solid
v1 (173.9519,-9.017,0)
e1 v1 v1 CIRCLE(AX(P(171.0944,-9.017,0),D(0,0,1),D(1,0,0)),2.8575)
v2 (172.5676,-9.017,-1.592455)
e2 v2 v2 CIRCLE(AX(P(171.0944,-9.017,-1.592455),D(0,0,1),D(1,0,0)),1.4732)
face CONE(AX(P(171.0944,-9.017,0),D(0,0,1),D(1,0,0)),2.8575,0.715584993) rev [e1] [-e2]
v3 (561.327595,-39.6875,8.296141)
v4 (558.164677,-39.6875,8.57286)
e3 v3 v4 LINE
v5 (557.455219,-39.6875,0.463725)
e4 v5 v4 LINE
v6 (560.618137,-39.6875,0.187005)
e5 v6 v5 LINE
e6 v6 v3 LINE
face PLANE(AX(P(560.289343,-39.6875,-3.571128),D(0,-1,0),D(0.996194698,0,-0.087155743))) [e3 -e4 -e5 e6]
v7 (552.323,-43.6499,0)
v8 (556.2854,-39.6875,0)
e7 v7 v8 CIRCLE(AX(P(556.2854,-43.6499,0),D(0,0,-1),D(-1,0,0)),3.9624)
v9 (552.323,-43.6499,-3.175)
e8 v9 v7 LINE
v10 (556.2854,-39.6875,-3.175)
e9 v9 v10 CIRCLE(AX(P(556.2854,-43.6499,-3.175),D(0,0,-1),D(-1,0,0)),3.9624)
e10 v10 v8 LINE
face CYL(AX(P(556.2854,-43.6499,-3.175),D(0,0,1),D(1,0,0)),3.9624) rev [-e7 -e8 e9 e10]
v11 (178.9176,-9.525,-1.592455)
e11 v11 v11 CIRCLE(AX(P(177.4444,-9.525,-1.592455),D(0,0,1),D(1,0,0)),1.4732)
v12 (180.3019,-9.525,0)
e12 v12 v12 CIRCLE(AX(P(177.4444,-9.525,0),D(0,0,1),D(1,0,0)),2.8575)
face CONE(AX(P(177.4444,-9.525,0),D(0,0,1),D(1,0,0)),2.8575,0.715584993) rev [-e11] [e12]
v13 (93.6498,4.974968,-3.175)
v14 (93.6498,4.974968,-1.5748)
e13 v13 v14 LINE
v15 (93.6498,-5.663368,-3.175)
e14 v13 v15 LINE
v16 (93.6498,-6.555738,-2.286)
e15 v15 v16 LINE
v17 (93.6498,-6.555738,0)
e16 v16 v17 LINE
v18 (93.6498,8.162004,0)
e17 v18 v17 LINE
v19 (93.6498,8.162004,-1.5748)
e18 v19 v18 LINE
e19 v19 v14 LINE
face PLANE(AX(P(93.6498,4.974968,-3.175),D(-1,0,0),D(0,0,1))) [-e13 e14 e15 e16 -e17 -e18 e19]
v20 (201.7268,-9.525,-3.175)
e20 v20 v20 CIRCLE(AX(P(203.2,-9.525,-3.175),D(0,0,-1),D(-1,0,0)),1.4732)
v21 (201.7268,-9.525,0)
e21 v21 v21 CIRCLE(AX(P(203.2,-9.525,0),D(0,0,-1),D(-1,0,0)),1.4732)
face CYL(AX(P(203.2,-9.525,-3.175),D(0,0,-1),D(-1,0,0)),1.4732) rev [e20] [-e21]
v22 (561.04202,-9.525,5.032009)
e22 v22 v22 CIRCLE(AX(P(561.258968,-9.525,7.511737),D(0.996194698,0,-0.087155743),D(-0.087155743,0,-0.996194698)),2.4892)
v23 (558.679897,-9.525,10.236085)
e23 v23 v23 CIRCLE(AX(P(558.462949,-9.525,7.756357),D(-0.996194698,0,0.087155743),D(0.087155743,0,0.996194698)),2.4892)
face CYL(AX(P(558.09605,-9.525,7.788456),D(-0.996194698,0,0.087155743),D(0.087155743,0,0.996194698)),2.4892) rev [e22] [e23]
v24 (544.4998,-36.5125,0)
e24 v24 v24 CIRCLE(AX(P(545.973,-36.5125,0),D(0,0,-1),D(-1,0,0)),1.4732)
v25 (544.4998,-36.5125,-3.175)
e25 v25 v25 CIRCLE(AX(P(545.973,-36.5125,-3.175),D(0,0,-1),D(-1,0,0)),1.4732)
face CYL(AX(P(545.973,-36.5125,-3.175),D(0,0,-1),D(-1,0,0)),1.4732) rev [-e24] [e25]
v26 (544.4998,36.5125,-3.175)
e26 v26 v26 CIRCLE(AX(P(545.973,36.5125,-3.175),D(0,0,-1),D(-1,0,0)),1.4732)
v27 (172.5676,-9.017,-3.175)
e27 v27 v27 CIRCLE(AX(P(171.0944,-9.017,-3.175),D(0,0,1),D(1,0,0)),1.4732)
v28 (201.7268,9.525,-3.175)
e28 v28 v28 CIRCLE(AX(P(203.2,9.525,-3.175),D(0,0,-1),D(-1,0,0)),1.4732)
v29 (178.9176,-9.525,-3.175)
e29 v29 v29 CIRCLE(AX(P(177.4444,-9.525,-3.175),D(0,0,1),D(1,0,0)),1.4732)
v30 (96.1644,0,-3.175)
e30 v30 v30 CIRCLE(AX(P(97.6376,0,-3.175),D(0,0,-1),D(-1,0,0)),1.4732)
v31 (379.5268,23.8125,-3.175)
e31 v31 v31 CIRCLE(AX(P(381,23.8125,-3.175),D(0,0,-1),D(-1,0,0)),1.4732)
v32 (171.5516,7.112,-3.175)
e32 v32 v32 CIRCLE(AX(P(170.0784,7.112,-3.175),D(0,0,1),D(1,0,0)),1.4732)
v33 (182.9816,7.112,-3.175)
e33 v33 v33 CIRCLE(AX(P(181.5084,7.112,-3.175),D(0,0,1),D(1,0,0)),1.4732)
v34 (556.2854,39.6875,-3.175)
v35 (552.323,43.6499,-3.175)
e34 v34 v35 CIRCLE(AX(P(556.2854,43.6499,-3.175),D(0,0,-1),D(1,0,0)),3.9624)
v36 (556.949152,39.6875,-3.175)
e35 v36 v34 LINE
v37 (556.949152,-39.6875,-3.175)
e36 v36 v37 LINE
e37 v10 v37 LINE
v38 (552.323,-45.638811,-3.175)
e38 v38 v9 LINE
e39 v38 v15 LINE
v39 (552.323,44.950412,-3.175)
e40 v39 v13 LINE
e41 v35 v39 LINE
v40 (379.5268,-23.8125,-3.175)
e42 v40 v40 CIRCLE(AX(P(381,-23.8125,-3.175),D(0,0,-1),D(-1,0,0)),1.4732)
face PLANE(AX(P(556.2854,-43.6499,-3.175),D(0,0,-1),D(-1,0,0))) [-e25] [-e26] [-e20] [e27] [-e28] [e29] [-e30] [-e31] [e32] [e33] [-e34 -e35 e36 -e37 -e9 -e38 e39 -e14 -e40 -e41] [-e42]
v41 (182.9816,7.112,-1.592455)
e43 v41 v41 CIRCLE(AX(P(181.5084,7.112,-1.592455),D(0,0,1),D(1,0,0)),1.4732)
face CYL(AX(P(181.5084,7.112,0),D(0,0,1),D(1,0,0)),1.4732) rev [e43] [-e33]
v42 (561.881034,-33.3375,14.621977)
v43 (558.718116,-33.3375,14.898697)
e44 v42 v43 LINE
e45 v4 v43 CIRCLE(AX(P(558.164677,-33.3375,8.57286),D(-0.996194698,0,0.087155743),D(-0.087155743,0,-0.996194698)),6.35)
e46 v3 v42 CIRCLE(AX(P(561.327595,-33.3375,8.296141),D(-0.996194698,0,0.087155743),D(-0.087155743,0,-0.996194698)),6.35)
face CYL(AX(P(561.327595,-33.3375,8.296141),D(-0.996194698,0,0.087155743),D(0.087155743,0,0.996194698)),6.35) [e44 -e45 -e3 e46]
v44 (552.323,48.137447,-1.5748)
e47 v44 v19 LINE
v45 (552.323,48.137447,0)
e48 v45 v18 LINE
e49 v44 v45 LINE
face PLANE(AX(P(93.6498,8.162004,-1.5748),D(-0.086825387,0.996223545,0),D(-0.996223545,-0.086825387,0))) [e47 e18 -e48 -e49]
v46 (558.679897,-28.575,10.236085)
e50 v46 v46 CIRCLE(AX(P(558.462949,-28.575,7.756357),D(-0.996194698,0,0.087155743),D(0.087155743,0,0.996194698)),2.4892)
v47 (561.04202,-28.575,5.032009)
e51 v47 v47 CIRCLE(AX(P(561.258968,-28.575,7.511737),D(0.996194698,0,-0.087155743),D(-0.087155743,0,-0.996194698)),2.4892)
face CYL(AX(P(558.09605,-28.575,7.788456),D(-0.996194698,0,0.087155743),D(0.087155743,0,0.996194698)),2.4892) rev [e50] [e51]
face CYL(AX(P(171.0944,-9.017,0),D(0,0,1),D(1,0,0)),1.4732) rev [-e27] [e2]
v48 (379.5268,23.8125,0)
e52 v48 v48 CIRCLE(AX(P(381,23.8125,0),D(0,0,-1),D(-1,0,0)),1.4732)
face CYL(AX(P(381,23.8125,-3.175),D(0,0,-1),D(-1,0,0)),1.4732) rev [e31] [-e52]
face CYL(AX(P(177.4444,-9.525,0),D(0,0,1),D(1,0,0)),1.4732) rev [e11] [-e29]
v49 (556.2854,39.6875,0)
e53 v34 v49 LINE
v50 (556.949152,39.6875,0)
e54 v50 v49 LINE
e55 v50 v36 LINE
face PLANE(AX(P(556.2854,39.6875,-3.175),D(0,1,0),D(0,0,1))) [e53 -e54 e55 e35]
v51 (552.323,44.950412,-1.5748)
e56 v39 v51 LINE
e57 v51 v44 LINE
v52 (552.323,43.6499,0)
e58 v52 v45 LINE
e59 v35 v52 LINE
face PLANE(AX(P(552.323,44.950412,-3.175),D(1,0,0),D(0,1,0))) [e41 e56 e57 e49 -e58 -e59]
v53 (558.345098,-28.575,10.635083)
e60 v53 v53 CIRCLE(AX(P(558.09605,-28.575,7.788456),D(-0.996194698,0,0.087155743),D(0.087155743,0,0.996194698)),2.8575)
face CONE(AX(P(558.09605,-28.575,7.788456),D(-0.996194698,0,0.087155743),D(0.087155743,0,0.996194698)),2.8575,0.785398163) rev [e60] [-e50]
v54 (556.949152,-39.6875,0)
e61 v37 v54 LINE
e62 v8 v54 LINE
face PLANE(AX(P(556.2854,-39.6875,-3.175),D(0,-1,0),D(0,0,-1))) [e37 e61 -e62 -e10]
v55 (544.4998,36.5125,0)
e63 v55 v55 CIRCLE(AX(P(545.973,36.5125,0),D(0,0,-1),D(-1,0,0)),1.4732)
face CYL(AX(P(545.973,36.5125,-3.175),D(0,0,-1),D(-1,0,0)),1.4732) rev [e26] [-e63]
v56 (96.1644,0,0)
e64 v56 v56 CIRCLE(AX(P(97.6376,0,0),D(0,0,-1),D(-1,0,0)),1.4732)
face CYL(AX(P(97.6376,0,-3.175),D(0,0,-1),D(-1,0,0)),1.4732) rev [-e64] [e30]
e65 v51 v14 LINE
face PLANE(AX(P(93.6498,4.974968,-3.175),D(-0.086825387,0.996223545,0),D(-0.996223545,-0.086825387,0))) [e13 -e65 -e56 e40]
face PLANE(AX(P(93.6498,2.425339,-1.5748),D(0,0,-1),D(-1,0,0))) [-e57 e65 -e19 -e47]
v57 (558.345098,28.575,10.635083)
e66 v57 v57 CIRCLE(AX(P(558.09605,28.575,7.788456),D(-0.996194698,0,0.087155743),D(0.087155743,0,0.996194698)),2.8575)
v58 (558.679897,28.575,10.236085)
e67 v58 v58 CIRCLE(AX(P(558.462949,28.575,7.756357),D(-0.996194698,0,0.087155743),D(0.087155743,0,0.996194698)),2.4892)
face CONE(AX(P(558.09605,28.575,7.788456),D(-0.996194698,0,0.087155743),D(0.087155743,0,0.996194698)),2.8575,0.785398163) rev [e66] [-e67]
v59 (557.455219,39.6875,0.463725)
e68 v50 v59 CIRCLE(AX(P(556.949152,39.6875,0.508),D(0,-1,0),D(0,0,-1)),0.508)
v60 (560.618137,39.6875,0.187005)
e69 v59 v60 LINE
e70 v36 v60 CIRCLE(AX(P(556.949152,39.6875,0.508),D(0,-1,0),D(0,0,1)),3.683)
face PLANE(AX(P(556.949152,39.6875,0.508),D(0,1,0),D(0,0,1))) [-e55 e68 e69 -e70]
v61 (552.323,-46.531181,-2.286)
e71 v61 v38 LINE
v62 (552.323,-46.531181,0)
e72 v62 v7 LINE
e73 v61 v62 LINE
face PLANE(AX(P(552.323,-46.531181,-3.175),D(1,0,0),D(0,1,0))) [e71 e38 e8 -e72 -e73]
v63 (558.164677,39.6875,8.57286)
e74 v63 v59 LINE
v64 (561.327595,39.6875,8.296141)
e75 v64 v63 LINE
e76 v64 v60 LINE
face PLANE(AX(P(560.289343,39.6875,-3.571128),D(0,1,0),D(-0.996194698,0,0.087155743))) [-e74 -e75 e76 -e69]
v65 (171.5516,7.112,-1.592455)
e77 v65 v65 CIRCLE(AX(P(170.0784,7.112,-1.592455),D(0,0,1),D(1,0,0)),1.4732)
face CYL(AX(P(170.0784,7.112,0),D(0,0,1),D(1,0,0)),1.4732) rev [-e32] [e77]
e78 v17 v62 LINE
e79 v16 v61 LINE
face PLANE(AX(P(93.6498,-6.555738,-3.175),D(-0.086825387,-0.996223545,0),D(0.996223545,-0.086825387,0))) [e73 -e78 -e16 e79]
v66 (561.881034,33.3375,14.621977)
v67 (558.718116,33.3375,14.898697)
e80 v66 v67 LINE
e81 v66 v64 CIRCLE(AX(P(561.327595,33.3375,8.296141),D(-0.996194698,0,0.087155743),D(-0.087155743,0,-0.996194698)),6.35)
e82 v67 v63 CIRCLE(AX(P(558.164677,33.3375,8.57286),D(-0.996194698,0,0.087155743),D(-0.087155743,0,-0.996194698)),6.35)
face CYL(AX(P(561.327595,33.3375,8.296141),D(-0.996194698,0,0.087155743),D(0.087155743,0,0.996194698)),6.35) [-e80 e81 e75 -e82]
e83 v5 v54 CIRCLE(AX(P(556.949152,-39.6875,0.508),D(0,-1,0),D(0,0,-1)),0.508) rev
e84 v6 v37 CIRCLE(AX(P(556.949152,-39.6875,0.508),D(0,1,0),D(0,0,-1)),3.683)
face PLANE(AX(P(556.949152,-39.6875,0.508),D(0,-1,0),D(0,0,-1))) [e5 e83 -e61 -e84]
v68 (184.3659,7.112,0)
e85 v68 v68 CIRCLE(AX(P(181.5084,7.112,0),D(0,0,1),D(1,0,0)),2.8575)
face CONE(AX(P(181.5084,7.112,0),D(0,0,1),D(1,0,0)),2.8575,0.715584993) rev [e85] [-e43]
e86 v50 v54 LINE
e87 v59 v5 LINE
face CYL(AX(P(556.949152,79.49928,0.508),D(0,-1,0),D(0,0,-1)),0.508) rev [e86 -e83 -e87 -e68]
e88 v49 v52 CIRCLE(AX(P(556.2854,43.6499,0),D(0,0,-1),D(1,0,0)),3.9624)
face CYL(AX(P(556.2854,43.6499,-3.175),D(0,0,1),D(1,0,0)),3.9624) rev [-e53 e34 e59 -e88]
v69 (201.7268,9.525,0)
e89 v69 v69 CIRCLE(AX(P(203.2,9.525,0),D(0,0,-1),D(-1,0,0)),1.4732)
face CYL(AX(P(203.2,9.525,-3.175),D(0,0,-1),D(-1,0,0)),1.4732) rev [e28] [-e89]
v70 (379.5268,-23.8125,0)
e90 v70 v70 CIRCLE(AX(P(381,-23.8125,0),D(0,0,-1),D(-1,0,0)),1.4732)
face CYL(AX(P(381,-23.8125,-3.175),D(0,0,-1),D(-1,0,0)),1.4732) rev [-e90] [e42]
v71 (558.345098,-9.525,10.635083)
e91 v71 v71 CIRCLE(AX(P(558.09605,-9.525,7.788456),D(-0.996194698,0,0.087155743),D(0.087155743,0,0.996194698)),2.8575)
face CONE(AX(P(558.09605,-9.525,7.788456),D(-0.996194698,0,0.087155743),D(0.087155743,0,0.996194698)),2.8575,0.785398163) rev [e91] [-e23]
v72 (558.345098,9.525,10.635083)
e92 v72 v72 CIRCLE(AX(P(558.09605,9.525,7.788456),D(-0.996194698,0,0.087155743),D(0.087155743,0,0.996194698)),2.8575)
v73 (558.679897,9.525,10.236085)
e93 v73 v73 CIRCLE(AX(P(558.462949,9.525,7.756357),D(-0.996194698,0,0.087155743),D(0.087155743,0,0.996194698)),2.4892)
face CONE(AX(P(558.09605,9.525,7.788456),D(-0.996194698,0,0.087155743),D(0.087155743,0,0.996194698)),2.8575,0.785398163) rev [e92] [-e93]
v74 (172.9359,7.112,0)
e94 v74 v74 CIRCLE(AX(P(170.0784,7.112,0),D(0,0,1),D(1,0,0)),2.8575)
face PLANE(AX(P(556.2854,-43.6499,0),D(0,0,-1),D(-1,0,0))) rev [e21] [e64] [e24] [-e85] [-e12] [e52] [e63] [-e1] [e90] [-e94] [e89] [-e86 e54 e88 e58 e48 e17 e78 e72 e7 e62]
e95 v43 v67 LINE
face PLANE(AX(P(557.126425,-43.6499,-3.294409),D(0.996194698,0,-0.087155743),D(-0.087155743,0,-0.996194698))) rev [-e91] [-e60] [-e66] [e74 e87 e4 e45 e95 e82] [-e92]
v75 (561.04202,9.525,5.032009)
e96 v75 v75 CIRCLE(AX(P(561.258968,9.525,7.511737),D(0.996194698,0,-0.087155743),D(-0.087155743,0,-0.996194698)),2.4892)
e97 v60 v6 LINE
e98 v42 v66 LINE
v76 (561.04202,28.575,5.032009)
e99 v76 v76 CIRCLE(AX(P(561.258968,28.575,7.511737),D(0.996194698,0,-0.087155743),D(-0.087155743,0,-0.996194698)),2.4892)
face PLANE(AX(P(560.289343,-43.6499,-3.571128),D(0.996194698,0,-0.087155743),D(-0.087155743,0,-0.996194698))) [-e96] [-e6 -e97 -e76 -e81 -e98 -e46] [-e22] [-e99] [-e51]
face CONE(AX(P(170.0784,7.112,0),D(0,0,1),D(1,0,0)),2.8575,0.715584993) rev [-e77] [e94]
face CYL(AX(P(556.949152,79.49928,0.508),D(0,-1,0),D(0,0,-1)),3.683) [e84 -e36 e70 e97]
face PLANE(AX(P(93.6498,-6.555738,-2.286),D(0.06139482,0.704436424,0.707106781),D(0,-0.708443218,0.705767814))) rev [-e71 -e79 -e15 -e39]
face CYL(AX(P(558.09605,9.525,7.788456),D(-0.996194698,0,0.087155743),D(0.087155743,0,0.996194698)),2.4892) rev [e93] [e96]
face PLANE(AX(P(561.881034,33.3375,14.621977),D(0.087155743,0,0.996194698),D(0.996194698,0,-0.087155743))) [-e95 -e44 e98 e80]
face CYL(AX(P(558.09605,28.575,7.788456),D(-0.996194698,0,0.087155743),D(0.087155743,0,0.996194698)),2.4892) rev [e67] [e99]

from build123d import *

# Parameters (mm, degrees)
BASE_FLANGE1_DEPTH                            = 3.175
SKETCHED_START                                = -39.6875
SKETCHED_BEND2_DEPTH                          = 79.375
SKETCHED_BEND2_2_DEPTH                        = 79.375
SKETCHED_START_2                              = 554.168566106
SKETCHED_BEND2_3_DEPTH                        = 4.831433894
EXTRUDE3_DEPTH                                = 1.5748
F_9_0_196_DIAMETER_HOLE1_D                    = 4.9784
F_9_0_196_DIAMETER_HOLE1_CSINK_D              = 5.715
F_9_0_196_DIAMETER_HOLE1_CSINK_ANGLE          = 90
CHAMFER1_SIZE                                 = 0.889
F_0_116_DIAMETER_HOLE1_D                      = 2.9464
CSK_FOR_4_FLAT_HEAD_MACHINE_SCREW1_AT_2_COUNT = 2
CSK_FOR_4_FLAT_HEAD_MACHINE_SCREW1_AT_2_PITCH = 16.160968319
CSK_FOR_4_FLAT_HEAD_MACHINE_SCREW1_AT_3_COUNT = 2
CSK_FOR_4_FLAT_HEAD_MACHINE_SCREW1_AT_3_PITCH = 11.43
CSK_FOR_4_FLAT_HEAD_MACHINE_SCREW1_AT_4_COUNT = 2
CSK_FOR_4_FLAT_HEAD_MACHINE_SCREW1_AT_4_PITCH = 18.194716953


with BuildPart() as part:
    # Base-Flange1: sheet metal written as solids
    # Sketch1 → Base-Flange1 (new body)
    with BuildSketch(Plane.XY):
        with BuildLine():
            Line((93.6498, 4.974967896), (552.323, 44.950411579))
            Line((552.323, 44.950411579), (552.323, 43.6499))
            ThreePointArc((552.323, 43.6499), (553.48356009, 40.84806009), (556.2854, 39.6875))
            Line((556.2854, 39.6875), (568.198, 39.6875))
            ThreePointArc((568.198, 39.6875), (572.688128061, 37.827628061), (574.548, 33.3375))
            Line((574.548, 33.3375), (574.548, -33.3375))
            ThreePointArc((574.548, -33.3375), (572.688128061, -37.827628061), (568.198, -39.6875))
            Line((568.198, -39.6875), (556.2854, -39.6875))
            ThreePointArc((556.2854, -39.6875), (553.48356009, -40.84806009), (552.323, -43.6499))
            Line((552.323, -43.6499), (552.323, -46.531181284))
            Line((552.323, -46.531181284), (93.6498, -6.555737601))
            Line((93.6498, -6.555737601), (93.6498, 4.974967896))
        make_face()
    extrude(amount=-BASE_FLANGE1_DEPTH)

    # Sketched Bend2: read off the stored shape, not the designer's step
    # Sketched Bend2 outline → Sketched Bend2 (cut)
    with BuildSketch(Plane(origin=(0, 0, 0), x_dir=(1, 0, 0), z_dir=(0, 1, 0)).offset(SKETCHED_START)):
        with BuildLine():
            ThreePointArc((556.949152286, 3.175), (559.367160247, 2.270079642), (560.596949567, 0))
            Line((560.596949567, 0), (574.548, 0))
            Line((574.548, 0), (574.548, 3.175))
            Line((574.548, 3.175), (556.949152286, 3.175))
        make_face()
    extrude(amount=SKETCHED_BEND2_DEPTH, mode=Mode.SUBTRACT)

    # Sketched Bend2 2 outline → Sketched Bend2 2 (add)
    with BuildSketch(Plane(origin=(0, 0, 0), x_dir=(1, 0, 0), z_dir=(0, 1, 0)).offset(SKETCHED_START)):
        with BuildLine():
            Line((557.455219193, -0.463724883), (558.718115569, -14.89869652))
            Line((558.718115569, -14.89869652), (561.881033736, -14.621977036))
            Line((561.881033736, -14.621977036), (560.618137359, -0.187005399))
            ThreePointArc((560.618137359, -0.187005399), (560.608738158, -0.09336734), (560.596949567, 0))
            Line((560.596949567, 0), (556.949152286, 0))
            ThreePointArc((556.949152286, 0), (557.292352112, -0.133463113), (557.455219193, -0.463724883))
        make_face()
    extrude(amount=SKETCHED_BEND2_2_DEPTH)

    # Sketched Bend2 3 outline → Sketched Bend2 3 (cut)
    with BuildSketch(Plane(origin=(0, 0, 0), x_dir=(0, 1, 0), z_dir=(0.9961946980917459, 0, -0.0871557427476548)).offset(SKETCHED_START_2)):
        with BuildLine():
            Line((39.6875, 63.537494831), (33.3375, 63.53749483))
            ThreePointArc((33.3375, 63.53749483), (37.827628061, 61.677622891), (39.6875, 57.18749483))
            Line((39.6875, 57.18749483), (39.6875, 63.537494831))
        make_face()
        with BuildLine():
            ThreePointArc((-39.6875, 57.18749483), (-37.827628061, 61.677622891), (-33.3375, 63.53749483))
            Line((-33.3375, 63.53749483), (-39.6875, 63.537494831))
            Line((-39.6875, 63.537494831), (-39.6875, 57.18749483))
        make_face()
    extrude(amount=SKETCHED_BEND2_3_DEPTH, mode=Mode.SUBTRACT)

    # Sketch6 → Extrude3 (add)
    with BuildSketch(Plane.XY):
        Polygon((93.6498, 2.425339339), (93.6498, 8.162003592), (552.323, 48.137447275), (552.323, 42.400783022), align=None)
    extrude(amount=-EXTRUDE3_DEPTH)

    # #9 (0.196) Diameter Hole1 (through all)
    with Locations(Plane(origin=(553.180458015, 0, -48.39701896), x_dir=(0.08715574274765482, 0, 0.9961946980917459), z_dir=(-0.9961946980917459, 0, 0.08715574274765482))):
        with Locations((56.40009483, 9.525), (56.40009483, 28.575), (56.40009483, -28.575), (56.40009483, -9.525)):
            CounterSinkHole(F_9_0_196_DIAMETER_HOLE1_D / 2, F_9_0_196_DIAMETER_HOLE1_CSINK_D / 2, counter_sink_angle=F_9_0_196_DIAMETER_HOLE1_CSINK_ANGLE)

    # Chamfer1
    chamfer1_edges = [part.edges().sort_by_distance(p)[0] for p in [
        (322.9864, -26.543459443, -3.175),
    ]]
    chamfer(chamfer1_edges, length=CHAMFER1_SIZE)

    # 0.116_ Diameter Hole1 (through all)
    with Locations(Plane(origin=(0, 0, -3.175), x_dir=(-1, 0, 0), z_dir=(0, 0, -1))):
        with Locations((-381, 23.8125), (-381, -23.8125), (-203.2, 9.525), (-203.2, -9.525), (-97.6376, 0), (-545.973, 36.5125), (-545.973, -36.5125)):
            Hole(F_0_116_DIAMETER_HOLE1_D / 2)

    # Sketch15 → CSK for #4 Flat Head Machine Screw1 (revolve, cut)
    with BuildSketch(Plane(origin=(170.0784, 7.112, 0), x_dir=(0, -1, 0), z_dir=(1, 0, 0))):
        Polygon((0, 0), (0, 3.175), (1.4732, 3.175), (1.4732, 1.592454986), (2.8575, 0), align=None)
    csk_for_4_flat_head_machine_screw1 = revolve(axis=Axis((170.0784, 7.112, 6.35), (0, 0, -1)), mode=Mode.SUBTRACT)

    # CSK for #4 Flat Head Machine Screw1 at 2: CSK for #4 Flat Head Machine Screw1 ×2
    with Locations(*[Vector(0.06286752006193388, -0.998021880983209, 0) * (i * CSK_FOR_4_FLAT_HEAD_MACHINE_SCREW1_AT_2_PITCH) for i in range(1, CSK_FOR_4_FLAT_HEAD_MACHINE_SCREW1_AT_2_COUNT)]):
        add(csk_for_4_flat_head_machine_screw1, mode=Mode.SUBTRACT)

    # CSK for #4 Flat Head Machine Screw1 at 3: CSK for #4 Flat Head Machine Screw1 ×2
    with Locations(*[(i * CSK_FOR_4_FLAT_HEAD_MACHINE_SCREW1_AT_3_PITCH, 0, 0) for i in range(1, CSK_FOR_4_FLAT_HEAD_MACHINE_SCREW1_AT_3_COUNT)]):
        add(csk_for_4_flat_head_machine_screw1, mode=Mode.SUBTRACT)

    # CSK for #4 Flat Head Machine Screw1 at 4: CSK for #4 Flat Head Machine Screw1 ×2
    with Locations(*[Vector(0.4048427914006695, -0.9143863047153069, 0) * (i * CSK_FOR_4_FLAT_HEAD_MACHINE_SCREW1_AT_4_PITCH) for i in range(1, CSK_FOR_4_FLAT_HEAD_MACHINE_SCREW1_AT_4_COUNT)]):
        add(csk_for_4_flat_head_machine_screw1, mode=Mode.SUBTRACT)


solid = part.part
